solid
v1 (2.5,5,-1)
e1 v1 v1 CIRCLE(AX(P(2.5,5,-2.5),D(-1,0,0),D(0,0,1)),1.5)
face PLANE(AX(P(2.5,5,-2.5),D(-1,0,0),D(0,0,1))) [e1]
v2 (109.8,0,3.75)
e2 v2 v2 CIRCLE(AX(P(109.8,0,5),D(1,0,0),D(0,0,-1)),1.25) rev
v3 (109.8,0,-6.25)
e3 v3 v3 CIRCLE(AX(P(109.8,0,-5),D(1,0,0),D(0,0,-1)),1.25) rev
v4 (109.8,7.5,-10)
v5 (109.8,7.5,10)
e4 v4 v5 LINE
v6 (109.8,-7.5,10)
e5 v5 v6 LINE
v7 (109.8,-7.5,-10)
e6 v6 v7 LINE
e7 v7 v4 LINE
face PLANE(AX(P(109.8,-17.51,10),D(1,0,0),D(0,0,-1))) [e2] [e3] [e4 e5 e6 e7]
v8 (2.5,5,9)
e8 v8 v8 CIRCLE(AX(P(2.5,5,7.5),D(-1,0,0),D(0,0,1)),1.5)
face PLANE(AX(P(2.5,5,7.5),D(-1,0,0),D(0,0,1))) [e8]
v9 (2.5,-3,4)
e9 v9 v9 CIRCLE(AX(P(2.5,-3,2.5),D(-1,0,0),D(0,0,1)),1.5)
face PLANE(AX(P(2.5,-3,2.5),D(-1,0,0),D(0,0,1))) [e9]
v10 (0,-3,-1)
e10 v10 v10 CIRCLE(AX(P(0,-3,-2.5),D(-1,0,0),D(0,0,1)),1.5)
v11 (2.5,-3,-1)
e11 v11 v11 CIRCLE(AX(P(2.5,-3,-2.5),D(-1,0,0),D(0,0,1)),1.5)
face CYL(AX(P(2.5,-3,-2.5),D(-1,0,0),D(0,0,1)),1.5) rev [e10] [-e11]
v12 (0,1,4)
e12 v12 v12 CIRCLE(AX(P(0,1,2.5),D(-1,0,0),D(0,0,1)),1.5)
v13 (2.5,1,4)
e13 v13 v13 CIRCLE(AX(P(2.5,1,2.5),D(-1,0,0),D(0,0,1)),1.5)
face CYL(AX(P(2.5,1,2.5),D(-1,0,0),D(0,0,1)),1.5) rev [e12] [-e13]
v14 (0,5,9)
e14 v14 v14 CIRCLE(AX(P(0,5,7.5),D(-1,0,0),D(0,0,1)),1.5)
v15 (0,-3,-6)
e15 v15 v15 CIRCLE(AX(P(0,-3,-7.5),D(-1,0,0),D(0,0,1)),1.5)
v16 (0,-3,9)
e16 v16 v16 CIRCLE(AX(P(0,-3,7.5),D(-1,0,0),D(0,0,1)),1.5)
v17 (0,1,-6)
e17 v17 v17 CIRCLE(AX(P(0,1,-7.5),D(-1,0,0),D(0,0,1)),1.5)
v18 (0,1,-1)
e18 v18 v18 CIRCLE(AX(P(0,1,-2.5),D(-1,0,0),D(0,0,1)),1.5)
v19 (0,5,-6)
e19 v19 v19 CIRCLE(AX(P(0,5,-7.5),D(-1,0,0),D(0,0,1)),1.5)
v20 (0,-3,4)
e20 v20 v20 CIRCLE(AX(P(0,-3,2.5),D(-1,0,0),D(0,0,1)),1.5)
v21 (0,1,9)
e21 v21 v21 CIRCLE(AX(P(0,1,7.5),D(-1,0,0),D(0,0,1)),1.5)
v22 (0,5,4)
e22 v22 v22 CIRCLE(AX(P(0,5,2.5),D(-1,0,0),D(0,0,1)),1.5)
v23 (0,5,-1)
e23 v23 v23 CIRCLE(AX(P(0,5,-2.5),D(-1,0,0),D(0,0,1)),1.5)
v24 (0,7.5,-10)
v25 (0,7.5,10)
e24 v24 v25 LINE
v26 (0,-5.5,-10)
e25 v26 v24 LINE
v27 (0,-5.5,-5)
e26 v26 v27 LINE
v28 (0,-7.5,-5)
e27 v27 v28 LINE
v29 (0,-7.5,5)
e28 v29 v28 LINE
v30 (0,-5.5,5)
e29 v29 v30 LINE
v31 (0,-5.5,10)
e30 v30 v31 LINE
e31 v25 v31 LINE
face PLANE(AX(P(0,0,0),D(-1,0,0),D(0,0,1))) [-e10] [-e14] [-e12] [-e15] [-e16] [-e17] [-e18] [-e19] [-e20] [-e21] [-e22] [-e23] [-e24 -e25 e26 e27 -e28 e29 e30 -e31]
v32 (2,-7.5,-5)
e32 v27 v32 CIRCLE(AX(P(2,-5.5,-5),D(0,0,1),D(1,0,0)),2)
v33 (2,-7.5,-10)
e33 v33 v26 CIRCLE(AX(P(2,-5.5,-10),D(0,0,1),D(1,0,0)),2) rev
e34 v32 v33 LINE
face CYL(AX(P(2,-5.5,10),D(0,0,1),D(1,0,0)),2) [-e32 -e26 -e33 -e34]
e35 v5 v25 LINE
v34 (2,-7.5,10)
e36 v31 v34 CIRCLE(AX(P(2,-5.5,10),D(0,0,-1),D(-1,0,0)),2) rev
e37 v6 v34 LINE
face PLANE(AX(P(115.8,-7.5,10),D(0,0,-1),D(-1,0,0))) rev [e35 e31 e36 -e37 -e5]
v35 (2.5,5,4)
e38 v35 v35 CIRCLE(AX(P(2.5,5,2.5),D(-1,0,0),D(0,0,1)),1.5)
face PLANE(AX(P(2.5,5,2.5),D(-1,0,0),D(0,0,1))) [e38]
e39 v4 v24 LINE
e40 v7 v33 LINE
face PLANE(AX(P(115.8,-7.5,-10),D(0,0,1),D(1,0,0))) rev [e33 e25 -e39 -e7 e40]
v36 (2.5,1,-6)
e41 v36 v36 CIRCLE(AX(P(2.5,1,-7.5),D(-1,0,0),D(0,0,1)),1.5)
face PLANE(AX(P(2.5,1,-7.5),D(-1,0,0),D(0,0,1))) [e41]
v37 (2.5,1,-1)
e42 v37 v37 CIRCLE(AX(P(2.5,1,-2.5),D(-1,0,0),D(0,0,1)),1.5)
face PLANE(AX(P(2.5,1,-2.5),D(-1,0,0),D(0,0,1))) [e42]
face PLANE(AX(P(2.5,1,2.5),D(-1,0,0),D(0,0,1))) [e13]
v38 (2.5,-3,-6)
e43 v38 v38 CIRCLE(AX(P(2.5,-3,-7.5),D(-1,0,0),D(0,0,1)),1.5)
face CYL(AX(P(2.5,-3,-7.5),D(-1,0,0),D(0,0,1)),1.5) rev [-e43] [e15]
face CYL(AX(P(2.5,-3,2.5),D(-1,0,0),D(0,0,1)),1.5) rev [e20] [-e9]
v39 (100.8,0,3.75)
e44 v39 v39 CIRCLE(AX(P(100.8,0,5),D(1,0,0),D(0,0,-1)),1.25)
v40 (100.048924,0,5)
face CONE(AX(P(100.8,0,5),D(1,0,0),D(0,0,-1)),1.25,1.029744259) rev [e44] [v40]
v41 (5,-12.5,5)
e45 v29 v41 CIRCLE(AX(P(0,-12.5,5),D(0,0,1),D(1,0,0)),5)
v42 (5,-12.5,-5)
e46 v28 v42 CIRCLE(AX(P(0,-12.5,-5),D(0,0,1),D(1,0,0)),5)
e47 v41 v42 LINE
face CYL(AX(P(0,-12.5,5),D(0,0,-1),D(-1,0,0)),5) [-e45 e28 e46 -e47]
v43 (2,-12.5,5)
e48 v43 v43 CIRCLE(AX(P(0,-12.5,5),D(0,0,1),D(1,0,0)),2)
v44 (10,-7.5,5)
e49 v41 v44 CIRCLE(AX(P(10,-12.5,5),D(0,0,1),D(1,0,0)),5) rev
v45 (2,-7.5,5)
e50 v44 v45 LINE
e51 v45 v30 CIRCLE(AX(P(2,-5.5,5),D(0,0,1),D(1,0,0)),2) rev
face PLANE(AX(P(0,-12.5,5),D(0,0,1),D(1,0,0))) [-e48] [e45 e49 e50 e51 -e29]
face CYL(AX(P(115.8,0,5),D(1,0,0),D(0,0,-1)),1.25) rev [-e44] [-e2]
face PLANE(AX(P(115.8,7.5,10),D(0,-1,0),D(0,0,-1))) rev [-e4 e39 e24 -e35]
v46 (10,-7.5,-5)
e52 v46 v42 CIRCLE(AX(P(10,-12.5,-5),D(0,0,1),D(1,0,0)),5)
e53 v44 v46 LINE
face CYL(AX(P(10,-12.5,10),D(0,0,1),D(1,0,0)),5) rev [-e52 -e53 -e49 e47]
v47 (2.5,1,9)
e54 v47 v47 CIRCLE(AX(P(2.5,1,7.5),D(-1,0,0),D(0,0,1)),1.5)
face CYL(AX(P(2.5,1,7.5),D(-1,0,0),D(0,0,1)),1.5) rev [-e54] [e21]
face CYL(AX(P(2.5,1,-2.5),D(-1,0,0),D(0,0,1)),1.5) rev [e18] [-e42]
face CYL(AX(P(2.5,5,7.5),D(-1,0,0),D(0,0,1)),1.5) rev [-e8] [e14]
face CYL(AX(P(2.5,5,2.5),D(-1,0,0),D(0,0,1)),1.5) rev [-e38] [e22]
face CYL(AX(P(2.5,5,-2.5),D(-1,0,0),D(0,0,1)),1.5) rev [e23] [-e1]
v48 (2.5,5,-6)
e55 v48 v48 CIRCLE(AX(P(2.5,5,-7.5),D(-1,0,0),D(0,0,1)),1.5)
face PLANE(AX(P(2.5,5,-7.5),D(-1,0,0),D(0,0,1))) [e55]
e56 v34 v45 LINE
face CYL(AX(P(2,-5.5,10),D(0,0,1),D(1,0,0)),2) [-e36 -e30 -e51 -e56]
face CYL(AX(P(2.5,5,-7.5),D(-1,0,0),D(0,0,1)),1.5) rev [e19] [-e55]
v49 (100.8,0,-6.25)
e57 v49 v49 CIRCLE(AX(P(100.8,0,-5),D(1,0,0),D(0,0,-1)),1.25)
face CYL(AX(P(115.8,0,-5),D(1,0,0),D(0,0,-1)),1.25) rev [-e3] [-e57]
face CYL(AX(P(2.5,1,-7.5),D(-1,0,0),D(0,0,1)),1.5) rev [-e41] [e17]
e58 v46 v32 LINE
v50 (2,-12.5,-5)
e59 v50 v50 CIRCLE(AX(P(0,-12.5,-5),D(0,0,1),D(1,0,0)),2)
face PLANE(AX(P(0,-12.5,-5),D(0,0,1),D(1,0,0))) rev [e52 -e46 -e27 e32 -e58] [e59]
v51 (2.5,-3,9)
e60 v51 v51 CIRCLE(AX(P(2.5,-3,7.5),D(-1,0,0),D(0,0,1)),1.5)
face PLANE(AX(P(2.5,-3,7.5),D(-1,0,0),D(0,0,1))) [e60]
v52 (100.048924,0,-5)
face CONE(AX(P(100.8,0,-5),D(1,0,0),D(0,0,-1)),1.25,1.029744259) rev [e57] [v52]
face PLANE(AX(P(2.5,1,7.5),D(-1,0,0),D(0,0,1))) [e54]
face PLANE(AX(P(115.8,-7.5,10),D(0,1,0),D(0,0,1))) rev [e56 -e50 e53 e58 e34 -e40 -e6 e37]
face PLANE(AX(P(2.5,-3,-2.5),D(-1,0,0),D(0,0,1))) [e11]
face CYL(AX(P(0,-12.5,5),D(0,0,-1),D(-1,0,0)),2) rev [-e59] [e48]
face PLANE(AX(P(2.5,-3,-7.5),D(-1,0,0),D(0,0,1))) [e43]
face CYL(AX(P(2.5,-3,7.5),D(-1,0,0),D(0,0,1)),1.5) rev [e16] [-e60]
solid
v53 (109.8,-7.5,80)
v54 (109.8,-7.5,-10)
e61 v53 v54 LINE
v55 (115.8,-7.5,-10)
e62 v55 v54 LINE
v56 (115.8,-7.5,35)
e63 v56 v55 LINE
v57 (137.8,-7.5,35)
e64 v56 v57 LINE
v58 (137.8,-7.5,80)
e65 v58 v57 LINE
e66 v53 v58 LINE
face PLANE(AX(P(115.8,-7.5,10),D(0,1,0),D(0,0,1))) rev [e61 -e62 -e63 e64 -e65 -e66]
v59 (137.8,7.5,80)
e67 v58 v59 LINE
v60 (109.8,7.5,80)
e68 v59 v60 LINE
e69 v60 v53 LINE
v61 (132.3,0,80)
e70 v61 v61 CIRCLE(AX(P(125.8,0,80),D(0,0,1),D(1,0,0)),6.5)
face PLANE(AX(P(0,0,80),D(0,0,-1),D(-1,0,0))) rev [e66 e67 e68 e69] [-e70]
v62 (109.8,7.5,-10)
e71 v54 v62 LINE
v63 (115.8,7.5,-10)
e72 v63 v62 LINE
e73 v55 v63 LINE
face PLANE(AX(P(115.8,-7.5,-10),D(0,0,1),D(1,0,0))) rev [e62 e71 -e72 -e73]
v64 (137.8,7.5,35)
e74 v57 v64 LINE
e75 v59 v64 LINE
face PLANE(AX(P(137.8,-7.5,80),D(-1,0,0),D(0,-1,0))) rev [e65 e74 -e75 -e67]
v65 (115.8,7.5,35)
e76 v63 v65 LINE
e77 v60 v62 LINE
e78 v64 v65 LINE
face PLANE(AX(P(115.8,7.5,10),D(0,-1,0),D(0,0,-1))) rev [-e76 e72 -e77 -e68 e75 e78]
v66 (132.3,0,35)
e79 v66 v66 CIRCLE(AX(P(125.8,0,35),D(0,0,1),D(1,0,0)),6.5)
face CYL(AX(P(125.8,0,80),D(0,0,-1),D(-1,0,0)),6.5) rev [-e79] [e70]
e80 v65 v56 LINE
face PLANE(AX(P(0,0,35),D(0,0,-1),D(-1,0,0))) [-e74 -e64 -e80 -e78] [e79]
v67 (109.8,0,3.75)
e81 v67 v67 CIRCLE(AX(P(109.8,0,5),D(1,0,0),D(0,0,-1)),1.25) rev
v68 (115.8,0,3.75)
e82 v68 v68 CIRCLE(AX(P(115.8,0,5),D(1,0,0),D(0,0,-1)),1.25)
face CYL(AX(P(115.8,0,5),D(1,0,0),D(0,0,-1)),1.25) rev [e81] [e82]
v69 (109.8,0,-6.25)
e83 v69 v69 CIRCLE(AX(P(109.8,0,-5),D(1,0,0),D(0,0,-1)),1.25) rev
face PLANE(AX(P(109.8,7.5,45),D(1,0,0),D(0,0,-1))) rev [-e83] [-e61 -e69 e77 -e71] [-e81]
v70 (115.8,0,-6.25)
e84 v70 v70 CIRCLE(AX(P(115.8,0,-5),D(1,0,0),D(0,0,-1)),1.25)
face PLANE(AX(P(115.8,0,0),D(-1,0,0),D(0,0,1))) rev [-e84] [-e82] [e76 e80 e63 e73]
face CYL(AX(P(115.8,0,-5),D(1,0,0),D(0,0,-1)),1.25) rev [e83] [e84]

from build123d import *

# Parameters (mm, degrees)
SKETCH4_W                 = 20
SKETCH4_H                 = 15
BOSS_EXTRUDE1_DEPTH       = 115.8
SKETCH5_W                 = 6
SKETCH5_H                 = 15
BOSS_EXTRUDE2_DEPTH       = 35
BOSS_EXTRUDE3_DEPTH       = 35
BOSS_EXTRUDE3_DEPTH_BACK  = 10
SKETCH6_W                 = 28
SKETCH6_H                 = 15
SKETCH6_R                 = 6.5
SKETCH7_R                 = 2
BOSS_EXTRUDE4_DEPTH       = 5
FILLET1_R                 = 2
FILLET2_R                 = 5
M3X0_5_TAPPED_HOLE2_D     = 2.5
M3X0_5_TAPPED_HOLE2_DEPTH = 15
M3X0_5_TAPPED_HOLE2_TIP   = 0.751075774
SKETCH19_R                = 1.5
CUT_EXTRUDE3_DEPTH        = 2.5
SPLIT2_SURFACE_1_BACK     = 171.637
SPLIT2_SURFACE_1_DEPTH    = 343.274
SPLIT2_SURFACE_2_BACK     = 171.637
SPLIT2_SURFACE_2_DEPTH    = 343.274


with BuildPart() as part:
    # Sketch4 → Boss-Extrude1 (new body)
    with BuildSketch(Plane(origin=(0, 0, 0), x_dir=(0, 0, -1), z_dir=(1, 0, 0))):
        Rectangle(SKETCH4_W, SKETCH4_H)
    extrude(amount=BOSS_EXTRUDE1_DEPTH)

    # Sketch5 → Boss-Extrude2 (add)
    with BuildSketch(Plane.XY.offset(10)):
        with Locations((112.8, 0)):
            Rectangle(SKETCH5_W, SKETCH5_H)
    extrude(amount=BOSS_EXTRUDE2_DEPTH)

    # Sketch6 → Boss-Extrude3 (add, two sides: drawn at the far end of the back side and taken through both)
    with BuildSketch(Plane.XY.offset(45).offset(-BOSS_EXTRUDE3_DEPTH_BACK)):
        with Locations((123.8, 0)):
            Rectangle(SKETCH6_W, SKETCH6_H)
        with Locations((125.8, 0)):
            Circle(SKETCH6_R, mode=Mode.SUBTRACT)
    extrude(amount=BOSS_EXTRUDE3_DEPTH + BOSS_EXTRUDE3_DEPTH_BACK)

    # Sketch7 → Boss-Extrude4 (add, symmetric)
    with BuildSketch(Plane.XY):
        with BuildLine():
            Line((5, -12.5), (5, -7.5))
            Line((5, -7.5), (0, -7.5))
            ThreePointArc((0, -7.5), (-3.535533906, -16.035533906), (5, -12.5))
        make_face()
        with Locations((0, -12.5)):
            Circle(SKETCH7_R, mode=Mode.SUBTRACT)
    extrude(amount=BOSS_EXTRUDE4_DEPTH, both=True)

    # Fillet1
    fillet1_edges = [part.edges().sort_by_distance(p)[0] for p in [
        (0, -7.5, 7.5),
        (0, -7.5, -7.5),
    ]]
    fillet(fillet1_edges, radius=FILLET1_R)

    # Fillet2
    fillet2_edges = [part.edges().sort_by_distance(p)[0] for p in [
        (5, -7.5, 0),
    ]]
    fillet(fillet2_edges, radius=FILLET2_R - 0.0001)  # a hair under: the kernel refuses the full size

    # M3x0.5 Tapped Hole2
    with Locations(Plane(origin=(115.8, 0, 0), x_dir=(0, 0, -1), z_dir=(1, 0, 0))):
        with Locations((5, 0), (-5, 0)):
            Hole(M3X0_5_TAPPED_HOLE2_D / 2, depth=M3X0_5_TAPPED_HOLE2_DEPTH)
            with Locations((0, 0, -(M3X0_5_TAPPED_HOLE2_DEPTH + M3X0_5_TAPPED_HOLE2_TIP / 2))):  # 118° drill point
                Cone(0, M3X0_5_TAPPED_HOLE2_D / 2, M3X0_5_TAPPED_HOLE2_TIP, mode=Mode.SUBTRACT)

    # Sketch19 → Cut-Extrude3 (cut)
    with BuildSketch(Plane.ZY):
        with Locations((-7.5, 5)):
            Circle(SKETCH19_R)
        with Locations((-2.5, 5)):
            Circle(SKETCH19_R)
        with Locations((2.5, 5)):
            Circle(SKETCH19_R)
        with Locations((7.5, 5)):
            Circle(SKETCH19_R)
        with Locations((-2.5, 1)):
            Circle(SKETCH19_R)
        with Locations((2.5, 1)):
            Circle(SKETCH19_R)
        with Locations((7.5, 1)):
            Circle(SKETCH19_R)
        with Locations((-2.5, -3)):
            Circle(SKETCH19_R)
        with Locations((2.5, -3)):
            Circle(SKETCH19_R)
        with Locations((7.5, -3)):
            Circle(SKETCH19_R)
        with Locations((-7.5, 1)):
            Circle(SKETCH19_R)
        with Locations((-7.5, -3)):
            Circle(SKETCH19_R)
    extrude(amount=-CUT_EXTRUDE3_DEPTH, mode=Mode.SUBTRACT)


with BuildPart() as body_2:
    # Split2: the piece behind the surface
    add(part.part)
    # Split2 surface: a surface, the sketch's curves swept straight by 343.274 mm
    with BuildLine(Plane(origin=(0, 7.5, 0), x_dir=(1, 0, 0), z_dir=(0, 1, 0)).offset(-SPLIT2_SURFACE_1_BACK), mode=Mode.PRIVATE) as split2_surface_1_path:
        Line((109.8, -10), (109.8, 10))
    split2_surface_1 = Shell.extrude(split2_surface_1_path.wire(), (0 * SPLIT2_SURFACE_1_DEPTH, 1 * SPLIT2_SURFACE_1_DEPTH, 0 * SPLIT2_SURFACE_1_DEPTH))
    split(bisect_by=split2_surface_1, keep=Keep.BOTTOM)


with BuildPart() as part_1:
    add(part.part)

    # Split2: split by a surface, the side it looks to stays
    # Split2 surface: a surface, the sketch's curves swept straight by 343.274 mm
    with BuildLine(Plane(origin=(0, 7.5, 0), x_dir=(1, 0, 0), z_dir=(0, 1, 0)).offset(-SPLIT2_SURFACE_2_BACK), mode=Mode.PRIVATE) as split2_surface_2_path:
        Line((109.8, -10), (109.8, 10))
    split2_surface_2 = Shell.extrude(split2_surface_2_path.wire(), (0 * SPLIT2_SURFACE_2_DEPTH, 1 * SPLIT2_SURFACE_2_DEPTH, 0 * SPLIT2_SURFACE_2_DEPTH))
    split(bisect_by=split2_surface_2, keep=Keep.TOP)


solid = Compound([body_2.part, part_1.part])
